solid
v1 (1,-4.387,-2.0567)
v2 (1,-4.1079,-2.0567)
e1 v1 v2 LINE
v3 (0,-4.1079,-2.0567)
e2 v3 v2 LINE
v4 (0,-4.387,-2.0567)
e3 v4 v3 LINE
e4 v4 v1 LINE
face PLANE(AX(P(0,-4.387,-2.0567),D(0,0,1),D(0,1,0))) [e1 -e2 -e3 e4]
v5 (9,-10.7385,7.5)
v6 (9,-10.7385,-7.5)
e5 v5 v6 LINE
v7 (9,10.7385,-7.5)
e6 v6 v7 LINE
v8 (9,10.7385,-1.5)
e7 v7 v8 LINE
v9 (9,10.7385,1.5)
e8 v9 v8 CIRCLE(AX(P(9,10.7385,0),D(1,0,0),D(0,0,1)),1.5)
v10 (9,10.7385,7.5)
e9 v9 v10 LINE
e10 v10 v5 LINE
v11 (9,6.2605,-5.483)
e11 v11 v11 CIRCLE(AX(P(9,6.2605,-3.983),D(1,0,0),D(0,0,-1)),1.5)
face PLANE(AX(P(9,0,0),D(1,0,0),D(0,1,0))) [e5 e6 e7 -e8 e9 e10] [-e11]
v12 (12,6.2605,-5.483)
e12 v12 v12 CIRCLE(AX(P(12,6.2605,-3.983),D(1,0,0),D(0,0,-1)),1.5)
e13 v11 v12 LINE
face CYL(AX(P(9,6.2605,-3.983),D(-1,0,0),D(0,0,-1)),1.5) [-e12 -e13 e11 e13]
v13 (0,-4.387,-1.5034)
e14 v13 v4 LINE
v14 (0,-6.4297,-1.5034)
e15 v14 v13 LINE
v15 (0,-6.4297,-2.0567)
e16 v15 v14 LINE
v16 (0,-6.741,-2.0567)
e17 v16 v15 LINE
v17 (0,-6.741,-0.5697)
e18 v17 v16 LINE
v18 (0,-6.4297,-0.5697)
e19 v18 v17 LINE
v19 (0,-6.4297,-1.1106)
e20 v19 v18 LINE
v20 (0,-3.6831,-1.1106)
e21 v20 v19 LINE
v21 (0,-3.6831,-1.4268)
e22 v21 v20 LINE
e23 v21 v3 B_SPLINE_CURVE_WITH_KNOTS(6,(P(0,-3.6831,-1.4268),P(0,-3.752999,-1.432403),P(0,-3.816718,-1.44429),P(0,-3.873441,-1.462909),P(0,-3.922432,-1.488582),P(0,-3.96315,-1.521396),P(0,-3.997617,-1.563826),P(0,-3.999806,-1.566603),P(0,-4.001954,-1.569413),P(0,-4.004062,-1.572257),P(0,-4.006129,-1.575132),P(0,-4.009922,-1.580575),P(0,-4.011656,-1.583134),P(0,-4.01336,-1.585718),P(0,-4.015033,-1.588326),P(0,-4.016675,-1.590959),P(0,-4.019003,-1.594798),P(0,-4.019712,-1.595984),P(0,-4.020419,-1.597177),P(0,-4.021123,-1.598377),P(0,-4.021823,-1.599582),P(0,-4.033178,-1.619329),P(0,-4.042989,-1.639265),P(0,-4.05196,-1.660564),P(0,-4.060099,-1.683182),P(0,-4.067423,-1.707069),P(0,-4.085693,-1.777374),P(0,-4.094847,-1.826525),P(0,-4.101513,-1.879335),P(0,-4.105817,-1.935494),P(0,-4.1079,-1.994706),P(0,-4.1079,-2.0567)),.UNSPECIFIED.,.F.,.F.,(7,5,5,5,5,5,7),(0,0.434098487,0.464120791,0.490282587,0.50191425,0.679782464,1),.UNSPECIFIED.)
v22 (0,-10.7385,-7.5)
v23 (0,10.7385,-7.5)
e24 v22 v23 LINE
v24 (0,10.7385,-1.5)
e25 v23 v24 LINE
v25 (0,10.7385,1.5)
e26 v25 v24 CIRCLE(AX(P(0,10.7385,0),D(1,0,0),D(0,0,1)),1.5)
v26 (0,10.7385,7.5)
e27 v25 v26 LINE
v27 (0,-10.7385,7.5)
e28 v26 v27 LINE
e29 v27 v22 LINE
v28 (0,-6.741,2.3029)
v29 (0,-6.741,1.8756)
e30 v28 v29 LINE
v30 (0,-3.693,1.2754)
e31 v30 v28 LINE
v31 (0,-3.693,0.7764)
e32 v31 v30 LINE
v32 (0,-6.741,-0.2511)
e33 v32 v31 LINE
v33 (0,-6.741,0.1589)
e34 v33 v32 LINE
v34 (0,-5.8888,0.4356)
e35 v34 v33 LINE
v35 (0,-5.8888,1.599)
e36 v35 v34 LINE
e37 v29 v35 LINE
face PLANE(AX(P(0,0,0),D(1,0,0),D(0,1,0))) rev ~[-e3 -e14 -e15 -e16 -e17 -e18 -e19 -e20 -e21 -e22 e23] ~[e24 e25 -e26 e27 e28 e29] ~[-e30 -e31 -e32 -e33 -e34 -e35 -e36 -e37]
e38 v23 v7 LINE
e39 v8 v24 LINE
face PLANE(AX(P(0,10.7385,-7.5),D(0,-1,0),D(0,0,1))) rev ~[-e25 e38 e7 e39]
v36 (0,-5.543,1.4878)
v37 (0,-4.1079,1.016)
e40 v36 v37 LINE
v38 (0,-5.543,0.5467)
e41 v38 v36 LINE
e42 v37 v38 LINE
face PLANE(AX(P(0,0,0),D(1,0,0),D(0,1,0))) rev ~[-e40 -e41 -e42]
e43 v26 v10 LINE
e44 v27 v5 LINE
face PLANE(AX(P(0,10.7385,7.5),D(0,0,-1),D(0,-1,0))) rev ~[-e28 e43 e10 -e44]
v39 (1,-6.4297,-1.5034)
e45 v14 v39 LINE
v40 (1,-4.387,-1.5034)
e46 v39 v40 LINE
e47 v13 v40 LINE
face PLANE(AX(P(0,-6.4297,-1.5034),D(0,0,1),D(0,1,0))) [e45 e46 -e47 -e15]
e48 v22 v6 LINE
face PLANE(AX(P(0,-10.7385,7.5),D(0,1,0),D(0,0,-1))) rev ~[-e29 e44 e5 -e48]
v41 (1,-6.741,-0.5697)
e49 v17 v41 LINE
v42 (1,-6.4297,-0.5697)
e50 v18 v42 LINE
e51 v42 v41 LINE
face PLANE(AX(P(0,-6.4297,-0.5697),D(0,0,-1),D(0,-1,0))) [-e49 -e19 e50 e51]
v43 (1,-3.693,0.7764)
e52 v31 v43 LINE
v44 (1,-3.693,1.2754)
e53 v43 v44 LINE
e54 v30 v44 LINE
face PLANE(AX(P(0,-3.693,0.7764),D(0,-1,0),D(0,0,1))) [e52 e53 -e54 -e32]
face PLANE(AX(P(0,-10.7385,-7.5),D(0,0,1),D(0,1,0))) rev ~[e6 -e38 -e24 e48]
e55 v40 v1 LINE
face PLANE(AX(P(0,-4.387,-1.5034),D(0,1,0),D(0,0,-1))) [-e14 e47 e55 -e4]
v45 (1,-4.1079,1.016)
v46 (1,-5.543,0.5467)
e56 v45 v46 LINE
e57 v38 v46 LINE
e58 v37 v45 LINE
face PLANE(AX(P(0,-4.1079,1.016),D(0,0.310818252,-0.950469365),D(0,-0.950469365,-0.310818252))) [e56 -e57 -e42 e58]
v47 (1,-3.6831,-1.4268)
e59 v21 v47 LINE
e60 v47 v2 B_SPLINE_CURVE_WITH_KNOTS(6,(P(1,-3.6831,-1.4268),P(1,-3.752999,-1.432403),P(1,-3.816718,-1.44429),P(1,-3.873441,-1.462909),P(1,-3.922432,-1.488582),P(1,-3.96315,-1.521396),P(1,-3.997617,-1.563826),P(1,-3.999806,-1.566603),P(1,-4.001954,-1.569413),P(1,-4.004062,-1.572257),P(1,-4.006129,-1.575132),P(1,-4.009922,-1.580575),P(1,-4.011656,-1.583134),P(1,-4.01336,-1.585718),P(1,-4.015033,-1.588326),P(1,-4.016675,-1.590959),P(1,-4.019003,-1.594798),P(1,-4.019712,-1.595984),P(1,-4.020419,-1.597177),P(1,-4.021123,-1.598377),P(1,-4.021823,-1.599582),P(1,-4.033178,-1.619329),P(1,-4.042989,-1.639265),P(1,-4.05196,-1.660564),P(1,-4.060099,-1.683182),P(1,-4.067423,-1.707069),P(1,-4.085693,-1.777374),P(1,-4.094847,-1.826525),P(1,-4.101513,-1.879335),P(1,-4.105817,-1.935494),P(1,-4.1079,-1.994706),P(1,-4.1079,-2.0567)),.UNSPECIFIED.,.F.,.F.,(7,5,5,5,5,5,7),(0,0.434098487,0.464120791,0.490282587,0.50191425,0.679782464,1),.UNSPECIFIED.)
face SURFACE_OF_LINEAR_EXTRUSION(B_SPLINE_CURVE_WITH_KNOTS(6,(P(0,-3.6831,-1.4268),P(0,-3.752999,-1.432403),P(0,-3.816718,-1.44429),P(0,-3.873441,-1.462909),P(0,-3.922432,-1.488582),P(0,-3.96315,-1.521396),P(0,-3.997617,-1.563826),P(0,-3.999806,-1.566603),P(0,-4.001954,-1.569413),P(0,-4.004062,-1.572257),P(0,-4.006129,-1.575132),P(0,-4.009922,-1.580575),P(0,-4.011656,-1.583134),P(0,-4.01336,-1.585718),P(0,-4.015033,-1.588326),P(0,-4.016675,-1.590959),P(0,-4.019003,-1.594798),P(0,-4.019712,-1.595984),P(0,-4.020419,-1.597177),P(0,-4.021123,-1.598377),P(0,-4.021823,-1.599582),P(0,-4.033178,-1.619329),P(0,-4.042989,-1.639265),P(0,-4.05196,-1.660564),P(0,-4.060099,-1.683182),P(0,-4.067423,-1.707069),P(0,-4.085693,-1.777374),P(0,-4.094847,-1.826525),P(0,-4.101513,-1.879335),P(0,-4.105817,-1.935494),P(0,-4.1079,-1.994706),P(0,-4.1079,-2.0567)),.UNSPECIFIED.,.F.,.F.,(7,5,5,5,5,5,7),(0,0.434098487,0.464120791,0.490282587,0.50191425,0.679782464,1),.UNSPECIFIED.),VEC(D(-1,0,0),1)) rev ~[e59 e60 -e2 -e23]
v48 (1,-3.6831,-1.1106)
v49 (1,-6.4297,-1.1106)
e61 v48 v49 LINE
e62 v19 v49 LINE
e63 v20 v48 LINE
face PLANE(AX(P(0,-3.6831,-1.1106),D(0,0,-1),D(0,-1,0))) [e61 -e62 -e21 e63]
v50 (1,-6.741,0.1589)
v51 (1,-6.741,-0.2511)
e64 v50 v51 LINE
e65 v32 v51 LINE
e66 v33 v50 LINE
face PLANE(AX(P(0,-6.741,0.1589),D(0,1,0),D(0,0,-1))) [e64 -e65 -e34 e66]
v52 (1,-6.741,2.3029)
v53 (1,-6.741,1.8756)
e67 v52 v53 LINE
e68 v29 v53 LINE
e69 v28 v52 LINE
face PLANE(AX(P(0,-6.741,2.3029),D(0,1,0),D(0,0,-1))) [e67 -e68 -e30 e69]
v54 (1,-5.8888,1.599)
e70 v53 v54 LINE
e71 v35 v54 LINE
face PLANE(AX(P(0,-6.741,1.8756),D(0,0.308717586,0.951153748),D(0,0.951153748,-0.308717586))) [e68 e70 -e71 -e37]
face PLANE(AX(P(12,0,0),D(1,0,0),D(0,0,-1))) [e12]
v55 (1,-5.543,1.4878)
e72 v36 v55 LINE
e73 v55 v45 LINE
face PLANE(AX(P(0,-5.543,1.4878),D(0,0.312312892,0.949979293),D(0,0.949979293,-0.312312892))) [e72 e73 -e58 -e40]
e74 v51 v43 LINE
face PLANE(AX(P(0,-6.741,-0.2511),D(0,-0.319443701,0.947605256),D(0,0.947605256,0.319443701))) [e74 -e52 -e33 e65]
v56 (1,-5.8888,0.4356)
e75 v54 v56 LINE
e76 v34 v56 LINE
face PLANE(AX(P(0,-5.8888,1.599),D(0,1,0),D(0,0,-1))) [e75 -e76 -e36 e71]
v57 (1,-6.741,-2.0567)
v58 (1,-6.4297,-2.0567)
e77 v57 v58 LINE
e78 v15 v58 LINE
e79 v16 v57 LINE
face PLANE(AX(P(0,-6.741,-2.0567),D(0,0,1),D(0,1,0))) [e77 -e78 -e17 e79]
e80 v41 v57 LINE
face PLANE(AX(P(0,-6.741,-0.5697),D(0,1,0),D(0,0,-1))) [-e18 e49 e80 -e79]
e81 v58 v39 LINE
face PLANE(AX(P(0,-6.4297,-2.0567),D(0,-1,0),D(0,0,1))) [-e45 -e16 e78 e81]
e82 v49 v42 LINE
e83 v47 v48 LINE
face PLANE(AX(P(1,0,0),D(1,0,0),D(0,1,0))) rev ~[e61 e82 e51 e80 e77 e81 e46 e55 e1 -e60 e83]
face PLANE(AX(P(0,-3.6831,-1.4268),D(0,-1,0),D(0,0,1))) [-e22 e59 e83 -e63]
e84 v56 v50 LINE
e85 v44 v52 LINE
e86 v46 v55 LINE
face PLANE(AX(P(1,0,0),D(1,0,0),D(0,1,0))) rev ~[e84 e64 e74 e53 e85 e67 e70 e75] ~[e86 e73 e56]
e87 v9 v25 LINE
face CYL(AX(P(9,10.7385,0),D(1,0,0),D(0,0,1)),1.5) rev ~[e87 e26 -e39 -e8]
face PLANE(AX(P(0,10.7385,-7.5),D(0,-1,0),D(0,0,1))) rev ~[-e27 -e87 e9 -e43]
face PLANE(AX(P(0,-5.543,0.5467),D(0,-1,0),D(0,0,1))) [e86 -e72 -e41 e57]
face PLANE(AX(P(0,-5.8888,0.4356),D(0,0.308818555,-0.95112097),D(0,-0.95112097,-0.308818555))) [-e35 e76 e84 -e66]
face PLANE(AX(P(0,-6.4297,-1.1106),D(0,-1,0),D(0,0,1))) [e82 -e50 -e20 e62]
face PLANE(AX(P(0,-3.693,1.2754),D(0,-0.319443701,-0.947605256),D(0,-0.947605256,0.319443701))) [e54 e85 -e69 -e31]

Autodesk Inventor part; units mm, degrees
ref_plane "YZ Plane" through (0, 0, 0) normal (1, 0, 0) x (0, 1, 0)
ref_plane "XZ Plane" through (0, 0, 0) normal (0, 1, 0) x (-1, 0, 0)
ref_plane "XY Plane" through (0, 0, 0) normal (0, 0, 1) x (1, 0, 0)
sketch "Sketch1" plane through (0, 0, 0) normal (1, 0, 0) x (0, 1, 0)
  line L0 (10.7385, 7.5) -> (-10.7385, 7.5)
  line L1 (-10.7385, 7.5) -> (-10.7385, -7.5)
  line L2 (-10.7385, -7.5) -> (10.7385, -7.5)
  line L3 (10.7385, -7.5) -> (10.7385, 7.5)
  point P0 (0, 0)
  dimension "d0" = 21.477
  dimension "d1" = 15
  dimension "d2" = 10.7385
  dimension "d3" = 7.5
extrude "Extrusion1" add sketch "Sketch1" along normal blind 9
sketch "Sketch2" plane through (9, 0, 0) normal (1, 0, 0) x (0, 0, -1)
  line L0 (7.5, 10.7385) -> (-7.5, 10.7385) projected
  arc A0 (-1.5, 10.7385) -> (1.5, 10.7385) centre (0, 10.7385) ccw
  point P0 (0, 0)
  dimension "d8" = 3
extrude "Extrusion2" cut sketch "Sketch2" against normal through all
sketch "Sketch3" plane through (9, 0, 0) normal (1, 0, 0) x (0, 0, -1)
  circle A0 centre (3.983, 6.2605) radius 1.5
  arc A1 (-1.5, 10.7385) -> (1.5, 10.7385) centre (0, 10.7385) ccw projected
  line L0 (7.5, 10.7385) -> (1.5, 10.7385) projected
  point P0 (0, 0)
  dimension "d12" = 3
  dimension "d13" = 3.983
  dimension "d14" = 4.478
extrude "Extrusion3" add sketch "Sketch3" along normal blind 3
sketch "Sketch4" plane through (0, 0, 0) normal (-1, 0, 0) x (0, 0, 1)
  line L0 (-2.5186, -3.6831) -> (10.3419, -3.6831) construction
  line L1 (10.3419, -3.6831) -> (10.3419, -8.8157) construction
  line L2 (10.3419, -8.8157) -> (-2.5186, -8.8157) construction
  line L3 (-2.5186, -8.8157) -> (-2.5186, -3.6831) construction
  line L4 (-0.5697, -6.741) -> (-2.0567, -6.741)
  line L5 (-2.0567, -6.741) -> (-2.0567, -6.4297)
  line L6 (-2.0567, -6.4297) -> (-1.5034, -6.4297)
  line L7 (-1.5034, -6.4297) -> (-1.5034, -4.387)
  line L8 (-1.5034, -4.387) -> (-2.0567, -4.387)
  line L9 (-2.0567, -4.387) -> (-2.0567, -4.1079)
  spline S0 degree 2 poles (-2.0567, -4.1079) (-1.743, -4.1079) (-1.4466, -3.9301) (-1.4268, -3.6831) knots 0 0 0 1 2 2 2
  line L10 (-1.4268, -3.6831) -> (-1.1106, -3.6831)
  line L11 (-1.1106, -3.6831) -> (-1.1106, -6.4297)
  line L12 (-1.1106, -6.4297) -> (-0.5697, -6.4297)
  line L13 (-0.5697, -6.4297) -> (-0.5697, -6.741)
  line L14 (-0.2511, -6.741) -> (0.7764, -3.693)
  line L15 (0.7764, -3.693) -> (1.2754, -3.693)
  line L16 (1.2754, -3.693) -> (2.3029, -6.741)
  line L17 (2.3029, -6.741) -> (1.8756, -6.741)
  line L18 (1.8756, -6.741) -> (1.599, -5.8888)
  line L19 (1.599, -5.8888) -> (0.4356, -5.8888)
  line L20 (0.4356, -5.8888) -> (0.1589, -6.741)
  line L21 (0.1589, -6.741) -> (-0.2511, -6.741)
  line L22 (1.4878, -5.543) -> (1.016, -4.1079)
  line L23 (1.016, -4.1079) -> (0.5467, -5.543)
  line L24 (0.5467, -5.543) -> (1.4878, -5.543)
  point P0 (0, 0)
emboss "Emboss1" sketch "Sketch4" operation cut depth 1 direction (1, 0, 0)
equation "\"d2\" = 0.5 * d0"
properties part number "Support_1A"
